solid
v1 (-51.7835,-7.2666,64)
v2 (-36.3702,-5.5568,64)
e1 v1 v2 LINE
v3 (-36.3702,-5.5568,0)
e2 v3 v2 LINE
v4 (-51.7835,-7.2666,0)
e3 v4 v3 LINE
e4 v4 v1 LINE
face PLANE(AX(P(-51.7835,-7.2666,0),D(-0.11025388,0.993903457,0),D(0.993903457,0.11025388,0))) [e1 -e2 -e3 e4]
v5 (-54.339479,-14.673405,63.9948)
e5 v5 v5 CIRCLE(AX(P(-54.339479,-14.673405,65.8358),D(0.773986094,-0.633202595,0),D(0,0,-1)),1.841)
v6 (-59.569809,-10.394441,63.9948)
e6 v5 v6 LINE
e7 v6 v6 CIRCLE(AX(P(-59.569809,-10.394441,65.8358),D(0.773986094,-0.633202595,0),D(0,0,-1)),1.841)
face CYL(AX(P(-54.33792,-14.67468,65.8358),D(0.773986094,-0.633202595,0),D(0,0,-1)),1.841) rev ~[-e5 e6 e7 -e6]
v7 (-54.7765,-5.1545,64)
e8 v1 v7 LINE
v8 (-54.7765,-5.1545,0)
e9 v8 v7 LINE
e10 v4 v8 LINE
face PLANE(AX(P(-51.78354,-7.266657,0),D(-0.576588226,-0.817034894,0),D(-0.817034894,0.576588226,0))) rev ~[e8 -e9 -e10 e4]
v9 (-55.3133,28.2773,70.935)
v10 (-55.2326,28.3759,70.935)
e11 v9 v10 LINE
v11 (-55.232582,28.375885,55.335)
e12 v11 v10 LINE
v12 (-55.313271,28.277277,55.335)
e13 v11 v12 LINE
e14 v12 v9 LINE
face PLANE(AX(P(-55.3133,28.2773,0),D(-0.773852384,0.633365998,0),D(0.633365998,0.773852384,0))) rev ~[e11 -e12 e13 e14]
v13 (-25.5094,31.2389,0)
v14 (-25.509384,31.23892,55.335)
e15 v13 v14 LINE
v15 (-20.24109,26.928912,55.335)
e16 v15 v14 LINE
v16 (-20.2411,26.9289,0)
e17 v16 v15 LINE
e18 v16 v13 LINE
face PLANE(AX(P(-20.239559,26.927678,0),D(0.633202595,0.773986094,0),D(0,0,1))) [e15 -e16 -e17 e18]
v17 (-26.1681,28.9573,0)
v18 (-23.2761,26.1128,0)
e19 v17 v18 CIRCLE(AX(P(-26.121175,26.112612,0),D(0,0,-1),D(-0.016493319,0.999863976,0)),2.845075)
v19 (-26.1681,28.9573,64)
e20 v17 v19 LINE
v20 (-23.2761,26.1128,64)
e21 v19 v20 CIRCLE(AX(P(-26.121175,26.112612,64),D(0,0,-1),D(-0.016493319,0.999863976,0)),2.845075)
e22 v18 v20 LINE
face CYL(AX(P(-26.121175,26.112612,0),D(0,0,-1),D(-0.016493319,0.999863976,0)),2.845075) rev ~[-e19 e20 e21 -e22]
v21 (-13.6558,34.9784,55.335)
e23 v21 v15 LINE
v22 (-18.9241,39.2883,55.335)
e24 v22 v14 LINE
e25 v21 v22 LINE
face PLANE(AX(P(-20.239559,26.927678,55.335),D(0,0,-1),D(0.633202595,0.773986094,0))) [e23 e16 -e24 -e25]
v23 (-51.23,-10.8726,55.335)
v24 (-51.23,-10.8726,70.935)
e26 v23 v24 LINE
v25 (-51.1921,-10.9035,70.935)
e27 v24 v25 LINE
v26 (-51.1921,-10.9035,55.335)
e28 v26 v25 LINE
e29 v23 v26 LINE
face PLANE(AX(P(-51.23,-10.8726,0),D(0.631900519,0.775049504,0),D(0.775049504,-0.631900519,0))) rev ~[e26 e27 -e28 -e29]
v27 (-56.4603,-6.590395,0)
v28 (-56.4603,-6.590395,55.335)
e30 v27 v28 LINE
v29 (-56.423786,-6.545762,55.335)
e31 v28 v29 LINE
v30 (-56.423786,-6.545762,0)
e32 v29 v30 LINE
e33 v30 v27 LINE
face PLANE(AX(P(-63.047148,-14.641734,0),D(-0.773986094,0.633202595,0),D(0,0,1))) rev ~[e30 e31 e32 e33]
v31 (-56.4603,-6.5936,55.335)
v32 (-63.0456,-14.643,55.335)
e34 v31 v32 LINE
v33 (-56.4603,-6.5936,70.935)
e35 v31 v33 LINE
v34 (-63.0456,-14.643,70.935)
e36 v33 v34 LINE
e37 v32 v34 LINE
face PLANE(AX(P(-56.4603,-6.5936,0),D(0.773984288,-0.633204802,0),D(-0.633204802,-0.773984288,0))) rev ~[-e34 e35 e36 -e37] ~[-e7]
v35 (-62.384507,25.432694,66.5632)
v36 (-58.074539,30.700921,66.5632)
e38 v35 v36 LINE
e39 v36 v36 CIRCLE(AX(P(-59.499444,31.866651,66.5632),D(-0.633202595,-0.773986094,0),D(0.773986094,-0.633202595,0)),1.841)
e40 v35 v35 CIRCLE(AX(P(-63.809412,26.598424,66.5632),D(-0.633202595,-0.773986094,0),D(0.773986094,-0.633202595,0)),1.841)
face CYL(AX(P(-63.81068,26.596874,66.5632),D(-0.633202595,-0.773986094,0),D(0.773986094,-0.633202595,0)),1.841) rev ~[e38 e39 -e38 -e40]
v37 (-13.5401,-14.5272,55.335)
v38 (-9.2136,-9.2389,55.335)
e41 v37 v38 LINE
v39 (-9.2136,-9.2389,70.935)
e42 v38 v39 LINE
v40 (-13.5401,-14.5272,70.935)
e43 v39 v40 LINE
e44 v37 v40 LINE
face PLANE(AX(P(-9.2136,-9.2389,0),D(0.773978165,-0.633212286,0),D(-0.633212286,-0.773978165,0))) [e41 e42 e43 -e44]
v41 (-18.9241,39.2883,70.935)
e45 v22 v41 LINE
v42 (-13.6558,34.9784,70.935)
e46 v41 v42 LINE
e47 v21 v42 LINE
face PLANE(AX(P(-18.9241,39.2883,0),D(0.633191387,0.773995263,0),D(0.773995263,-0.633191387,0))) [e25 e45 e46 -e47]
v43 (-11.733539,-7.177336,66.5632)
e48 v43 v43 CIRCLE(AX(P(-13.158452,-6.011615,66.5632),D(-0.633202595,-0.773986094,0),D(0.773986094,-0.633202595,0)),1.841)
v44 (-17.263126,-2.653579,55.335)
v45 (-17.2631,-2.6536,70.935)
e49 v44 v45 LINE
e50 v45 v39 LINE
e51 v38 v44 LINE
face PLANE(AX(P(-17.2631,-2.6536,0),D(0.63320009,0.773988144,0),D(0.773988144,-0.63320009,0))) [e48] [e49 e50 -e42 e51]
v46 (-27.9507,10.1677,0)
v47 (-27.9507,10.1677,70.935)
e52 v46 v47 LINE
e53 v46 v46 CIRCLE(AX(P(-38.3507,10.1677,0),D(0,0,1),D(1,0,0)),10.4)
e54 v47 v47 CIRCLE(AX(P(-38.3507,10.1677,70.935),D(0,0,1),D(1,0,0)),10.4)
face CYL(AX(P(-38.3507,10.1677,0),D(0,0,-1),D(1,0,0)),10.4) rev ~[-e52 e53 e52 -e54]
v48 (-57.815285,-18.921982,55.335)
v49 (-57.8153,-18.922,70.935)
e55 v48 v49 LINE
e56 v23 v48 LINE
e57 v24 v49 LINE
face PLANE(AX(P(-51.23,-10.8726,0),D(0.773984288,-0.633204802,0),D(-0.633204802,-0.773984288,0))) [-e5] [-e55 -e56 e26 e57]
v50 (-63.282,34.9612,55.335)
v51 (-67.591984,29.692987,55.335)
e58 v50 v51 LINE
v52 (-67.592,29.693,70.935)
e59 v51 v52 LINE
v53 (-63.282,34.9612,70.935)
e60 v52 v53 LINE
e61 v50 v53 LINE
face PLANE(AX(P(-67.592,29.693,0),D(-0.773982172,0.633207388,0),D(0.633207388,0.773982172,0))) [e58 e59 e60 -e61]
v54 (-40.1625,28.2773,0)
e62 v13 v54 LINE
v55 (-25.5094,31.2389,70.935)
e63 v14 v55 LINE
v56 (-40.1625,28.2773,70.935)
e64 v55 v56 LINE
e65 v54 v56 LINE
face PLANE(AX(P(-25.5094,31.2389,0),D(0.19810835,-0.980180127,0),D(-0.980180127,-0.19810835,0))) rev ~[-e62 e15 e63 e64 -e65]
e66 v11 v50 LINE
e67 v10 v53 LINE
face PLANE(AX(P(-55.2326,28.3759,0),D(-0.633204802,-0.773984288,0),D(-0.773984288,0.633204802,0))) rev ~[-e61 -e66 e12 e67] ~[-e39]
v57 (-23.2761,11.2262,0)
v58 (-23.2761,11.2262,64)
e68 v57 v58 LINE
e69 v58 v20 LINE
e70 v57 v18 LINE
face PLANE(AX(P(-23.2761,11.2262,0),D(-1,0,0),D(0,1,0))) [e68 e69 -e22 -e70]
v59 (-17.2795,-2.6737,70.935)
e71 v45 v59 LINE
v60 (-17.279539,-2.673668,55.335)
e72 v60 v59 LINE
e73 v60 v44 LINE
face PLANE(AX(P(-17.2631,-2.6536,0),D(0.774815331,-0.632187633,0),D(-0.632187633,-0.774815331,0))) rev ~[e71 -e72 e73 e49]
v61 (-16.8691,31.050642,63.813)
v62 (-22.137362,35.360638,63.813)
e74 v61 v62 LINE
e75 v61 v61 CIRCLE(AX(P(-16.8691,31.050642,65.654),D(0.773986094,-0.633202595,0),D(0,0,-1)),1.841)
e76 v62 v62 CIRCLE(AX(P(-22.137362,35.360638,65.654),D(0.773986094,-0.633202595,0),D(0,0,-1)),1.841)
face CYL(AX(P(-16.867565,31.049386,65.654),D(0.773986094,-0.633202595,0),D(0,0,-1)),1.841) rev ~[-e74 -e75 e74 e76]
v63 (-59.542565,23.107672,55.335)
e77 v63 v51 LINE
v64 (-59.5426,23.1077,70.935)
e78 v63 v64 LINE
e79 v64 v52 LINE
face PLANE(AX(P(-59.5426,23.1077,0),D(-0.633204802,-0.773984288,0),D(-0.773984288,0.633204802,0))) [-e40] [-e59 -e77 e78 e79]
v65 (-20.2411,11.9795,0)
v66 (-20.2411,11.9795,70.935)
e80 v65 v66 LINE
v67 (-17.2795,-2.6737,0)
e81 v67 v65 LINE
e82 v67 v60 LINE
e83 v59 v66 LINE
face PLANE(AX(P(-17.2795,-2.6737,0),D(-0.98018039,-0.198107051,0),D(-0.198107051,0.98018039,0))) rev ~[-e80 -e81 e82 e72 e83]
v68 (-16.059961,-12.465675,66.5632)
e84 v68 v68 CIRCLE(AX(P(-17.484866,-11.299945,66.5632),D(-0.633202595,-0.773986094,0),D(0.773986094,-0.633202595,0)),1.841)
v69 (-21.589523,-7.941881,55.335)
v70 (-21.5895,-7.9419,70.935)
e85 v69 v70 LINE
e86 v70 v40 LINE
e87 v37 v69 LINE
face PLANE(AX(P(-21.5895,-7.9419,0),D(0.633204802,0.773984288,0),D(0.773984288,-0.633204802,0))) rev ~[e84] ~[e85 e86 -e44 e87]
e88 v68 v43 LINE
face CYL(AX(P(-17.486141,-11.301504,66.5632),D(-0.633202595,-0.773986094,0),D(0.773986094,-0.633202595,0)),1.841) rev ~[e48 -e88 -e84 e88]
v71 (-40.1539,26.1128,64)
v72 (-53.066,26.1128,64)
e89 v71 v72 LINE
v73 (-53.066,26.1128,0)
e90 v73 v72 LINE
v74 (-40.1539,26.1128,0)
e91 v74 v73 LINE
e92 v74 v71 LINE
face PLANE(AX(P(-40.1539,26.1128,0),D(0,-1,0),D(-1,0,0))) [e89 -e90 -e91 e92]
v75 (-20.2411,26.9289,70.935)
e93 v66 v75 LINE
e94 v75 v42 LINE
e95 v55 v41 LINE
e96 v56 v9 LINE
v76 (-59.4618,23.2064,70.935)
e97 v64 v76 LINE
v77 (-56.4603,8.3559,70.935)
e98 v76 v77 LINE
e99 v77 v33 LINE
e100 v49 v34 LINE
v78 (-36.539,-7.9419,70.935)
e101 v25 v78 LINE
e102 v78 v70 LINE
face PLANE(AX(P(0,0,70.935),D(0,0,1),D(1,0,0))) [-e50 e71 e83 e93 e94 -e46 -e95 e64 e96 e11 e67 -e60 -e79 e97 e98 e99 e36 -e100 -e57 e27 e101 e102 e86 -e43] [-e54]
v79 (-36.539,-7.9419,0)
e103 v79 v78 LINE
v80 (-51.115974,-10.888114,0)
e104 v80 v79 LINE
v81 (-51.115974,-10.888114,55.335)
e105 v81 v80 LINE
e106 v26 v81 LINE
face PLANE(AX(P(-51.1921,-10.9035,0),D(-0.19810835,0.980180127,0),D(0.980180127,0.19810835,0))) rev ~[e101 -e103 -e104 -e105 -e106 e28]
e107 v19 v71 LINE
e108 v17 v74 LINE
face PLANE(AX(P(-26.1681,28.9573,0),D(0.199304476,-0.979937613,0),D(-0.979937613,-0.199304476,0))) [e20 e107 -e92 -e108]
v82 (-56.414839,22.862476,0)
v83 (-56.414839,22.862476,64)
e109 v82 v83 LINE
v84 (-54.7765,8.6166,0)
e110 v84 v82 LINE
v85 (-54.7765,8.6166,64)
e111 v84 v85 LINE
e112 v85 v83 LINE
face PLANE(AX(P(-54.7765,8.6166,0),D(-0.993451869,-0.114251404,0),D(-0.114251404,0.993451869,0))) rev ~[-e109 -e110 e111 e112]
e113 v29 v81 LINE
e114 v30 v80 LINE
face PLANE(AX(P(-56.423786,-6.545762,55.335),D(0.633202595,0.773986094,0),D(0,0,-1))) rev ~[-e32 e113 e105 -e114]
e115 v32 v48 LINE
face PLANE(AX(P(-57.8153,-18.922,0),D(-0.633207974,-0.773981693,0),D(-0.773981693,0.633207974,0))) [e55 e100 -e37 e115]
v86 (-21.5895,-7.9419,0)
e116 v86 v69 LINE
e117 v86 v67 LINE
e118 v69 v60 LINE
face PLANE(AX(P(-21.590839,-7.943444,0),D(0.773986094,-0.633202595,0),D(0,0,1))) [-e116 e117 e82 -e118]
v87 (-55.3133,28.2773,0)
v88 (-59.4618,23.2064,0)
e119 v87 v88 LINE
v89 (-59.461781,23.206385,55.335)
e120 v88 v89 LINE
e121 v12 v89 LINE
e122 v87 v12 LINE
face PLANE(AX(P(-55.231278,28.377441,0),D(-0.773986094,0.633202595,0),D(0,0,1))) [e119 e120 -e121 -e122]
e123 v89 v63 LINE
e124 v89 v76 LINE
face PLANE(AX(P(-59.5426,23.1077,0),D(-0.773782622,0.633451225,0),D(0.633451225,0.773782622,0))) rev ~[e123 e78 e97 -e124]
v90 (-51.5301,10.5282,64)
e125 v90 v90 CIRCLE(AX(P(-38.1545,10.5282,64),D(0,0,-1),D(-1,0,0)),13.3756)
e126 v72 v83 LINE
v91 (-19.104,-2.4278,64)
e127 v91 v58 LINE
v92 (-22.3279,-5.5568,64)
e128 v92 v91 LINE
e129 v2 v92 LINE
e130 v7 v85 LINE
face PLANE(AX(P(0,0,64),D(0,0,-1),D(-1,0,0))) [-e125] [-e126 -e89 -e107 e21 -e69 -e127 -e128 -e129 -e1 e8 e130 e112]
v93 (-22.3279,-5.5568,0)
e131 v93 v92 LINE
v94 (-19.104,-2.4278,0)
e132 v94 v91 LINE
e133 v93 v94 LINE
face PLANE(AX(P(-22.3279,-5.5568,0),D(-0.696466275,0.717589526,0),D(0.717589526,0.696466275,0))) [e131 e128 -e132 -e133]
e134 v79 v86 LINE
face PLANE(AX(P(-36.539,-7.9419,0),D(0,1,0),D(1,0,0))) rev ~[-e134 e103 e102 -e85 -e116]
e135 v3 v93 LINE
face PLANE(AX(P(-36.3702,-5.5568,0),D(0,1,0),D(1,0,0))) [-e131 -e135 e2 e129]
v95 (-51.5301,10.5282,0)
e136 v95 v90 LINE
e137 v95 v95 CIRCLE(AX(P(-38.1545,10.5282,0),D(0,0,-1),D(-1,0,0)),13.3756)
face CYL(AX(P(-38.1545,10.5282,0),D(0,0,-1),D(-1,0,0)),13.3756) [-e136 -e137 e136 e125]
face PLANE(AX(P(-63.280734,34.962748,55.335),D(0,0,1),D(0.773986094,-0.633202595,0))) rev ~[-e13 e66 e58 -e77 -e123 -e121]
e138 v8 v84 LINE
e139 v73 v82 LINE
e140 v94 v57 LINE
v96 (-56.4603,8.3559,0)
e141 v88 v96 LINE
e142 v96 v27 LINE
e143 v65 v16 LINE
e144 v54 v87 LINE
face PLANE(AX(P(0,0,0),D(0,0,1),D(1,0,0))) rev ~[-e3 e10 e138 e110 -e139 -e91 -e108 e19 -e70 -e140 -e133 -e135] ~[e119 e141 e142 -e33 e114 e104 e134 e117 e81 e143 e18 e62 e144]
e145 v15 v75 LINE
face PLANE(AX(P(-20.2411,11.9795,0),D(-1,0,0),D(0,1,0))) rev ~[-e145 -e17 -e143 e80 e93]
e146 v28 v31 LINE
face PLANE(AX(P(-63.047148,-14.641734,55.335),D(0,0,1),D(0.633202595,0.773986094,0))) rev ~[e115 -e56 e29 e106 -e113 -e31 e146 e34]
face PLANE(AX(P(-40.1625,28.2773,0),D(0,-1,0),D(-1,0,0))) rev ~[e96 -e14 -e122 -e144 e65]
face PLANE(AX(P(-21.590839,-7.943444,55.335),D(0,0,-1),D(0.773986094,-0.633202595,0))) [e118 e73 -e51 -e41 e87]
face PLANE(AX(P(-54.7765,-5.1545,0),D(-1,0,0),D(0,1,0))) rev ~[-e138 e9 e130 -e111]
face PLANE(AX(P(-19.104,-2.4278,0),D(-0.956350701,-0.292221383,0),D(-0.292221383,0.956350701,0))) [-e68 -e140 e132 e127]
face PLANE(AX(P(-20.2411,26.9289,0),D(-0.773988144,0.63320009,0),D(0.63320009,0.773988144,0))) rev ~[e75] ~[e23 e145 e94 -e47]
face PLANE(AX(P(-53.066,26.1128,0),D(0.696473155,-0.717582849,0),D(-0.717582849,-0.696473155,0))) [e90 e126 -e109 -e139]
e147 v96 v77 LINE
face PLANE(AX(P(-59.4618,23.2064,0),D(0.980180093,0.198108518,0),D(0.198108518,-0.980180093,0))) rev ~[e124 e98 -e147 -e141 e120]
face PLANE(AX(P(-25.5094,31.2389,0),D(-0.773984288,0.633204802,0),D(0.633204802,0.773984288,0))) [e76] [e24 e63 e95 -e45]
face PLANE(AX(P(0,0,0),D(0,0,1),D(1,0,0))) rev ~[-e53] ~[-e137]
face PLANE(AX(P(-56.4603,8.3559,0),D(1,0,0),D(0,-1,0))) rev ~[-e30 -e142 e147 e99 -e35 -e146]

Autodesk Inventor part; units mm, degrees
ref_plane "YZ Plane" through (0, 0, 0) normal (1, 0, 0) x (0, 1, 0)
ref_plane "XZ Plane" through (0, 0, 0) normal (0, 1, 0) x (-1, 0, 0)
ref_plane "XY Plane" through (0, 0, 0) normal (0, 0, 1) x (1, 0, 0)
sketch "Sketch1" plane through (0, 0, 0) normal (0, 0, 1) x (1, 0, 0)
  circle A0 centre (-38.3507, 10.1677) radius 10.4
  line L0 (-51.23, -10.8726) -> (-51.1921, -10.9035)
  line L1 (-51.1921, -10.9035) -> (-36.539, -7.9419)
  line L2 (-36.539, -7.9419) -> (-21.5895, -7.9419)
  line L3 (-21.5895, -7.9419) -> (-13.5401, -14.5272)
  line L4 (-9.2136, -9.2389) -> (-13.5401, -14.5272)
  line L5 (-17.2631, -2.6536) -> (-9.2136, -9.2389)
  line L6 (-17.2631, -2.6536) -> (-17.2795, -2.6737)
  line L7 (-17.2795, -2.6737) -> (-20.2411, 11.9795)
  line L8 (-20.2411, 11.9795) -> (-20.2411, 26.9289)
  line L9 (-20.2411, 26.9289) -> (-13.6558, 34.9784)
  line L10 (-18.9241, 39.2883) -> (-13.6558, 34.9784)
  line L11 (-25.5094, 31.2389) -> (-18.9241, 39.2883)
  line L12 (-25.5094, 31.2389) -> (-40.1625, 28.2773)
  line L13 (-40.1625, 28.2773) -> (-55.3133, 28.2773)
  line L14 (-55.3133, 28.2773) -> (-55.2326, 28.3759)
  line L15 (-55.2326, 28.3759) -> (-63.282, 34.9612)
  line L16 (-67.592, 29.693) -> (-63.282, 34.9612)
  line L17 (-59.5426, 23.1077) -> (-67.592, 29.693)
  line L18 (-59.5426, 23.1077) -> (-59.4618, 23.2064)
  line L19 (-59.4618, 23.2064) -> (-56.4603, 8.3559)
  line L20 (-56.4603, 8.3559) -> (-56.4603, -6.5936)
  line L21 (-56.4603, -6.5936) -> (-63.0456, -14.643)
  line L22 (-57.8153, -18.922) -> (-63.0456, -14.643)
  line L23 (-51.23, -10.8726) -> (-57.8153, -18.922)
  circle A1 centre (-38.3507, 10.1677) radius 10.4
  line L24 (-51.23, -10.8726) -> (-51.1921, -10.9035)
  line L25 (-51.1921, -10.9035) -> (-36.539, -7.9419)
  line L26 (-36.539, -7.9419) -> (-21.5895, -7.9419)
  line L27 (-21.5895, -7.9419) -> (-13.5401, -14.5272)
  line L28 (-9.2136, -9.2389) -> (-13.5401, -14.5272)
  line L29 (-17.2631, -2.6536) -> (-9.2136, -9.2389)
  line L30 (-17.2631, -2.6536) -> (-17.2795, -2.6737)
  line L31 (-17.2795, -2.6737) -> (-20.2411, 11.9795)
  line L32 (-20.2411, 11.9795) -> (-20.2411, 26.9289)
  line L33 (-20.2411, 26.9289) -> (-13.6558, 34.9784)
  line L34 (-18.9241, 39.2883) -> (-13.6558, 34.9784)
  line L35 (-25.5094, 31.2389) -> (-18.9241, 39.2883)
  line L36 (-25.5094, 31.2389) -> (-40.1625, 28.2773)
  line L37 (-40.1625, 28.2773) -> (-55.3133, 28.2773)
  line L38 (-55.3133, 28.2773) -> (-55.2326, 28.3759)
  line L39 (-55.2326, 28.3759) -> (-63.282, 34.9612)
  line L40 (-67.592, 29.693) -> (-63.282, 34.9612)
  line L41 (-59.5426, 23.1077) -> (-67.592, 29.693)
  line L42 (-59.5426, 23.1077) -> (-59.4618, 23.2064)
  line L43 (-59.4618, 23.2064) -> (-56.4603, 8.3559)
  line L44 (-56.4603, 8.3559) -> (-56.4603, -6.5936)
  line L45 (-56.4603, -6.5936) -> (-63.0456, -14.643)
  line L46 (-57.8153, -18.922) -> (-63.0456, -14.643)
  line L47 (-51.23, -10.8726) -> (-57.8153, -18.922)
  point P0 (0, 0)
extrude "Extrusion1" add sketch "Sketch1" along normal blind 70.935
sketch "Sketch2" plane through (-59.5426, 23.1077, 0) normal (-0.6332026, -0.7739861, 0) x (0.7739861, -0.6332026, 0)
  line L0 (47.2215, 0) -> (47.2215, 55.335)
  line L1 (49.0358, 0) -> (49.0358, 70.935) projected
  line L2 (49.0358, 55.335) -> (60.717, 55.335)
  line L3 (60.717, 55.335) -> (60.717, 0)
  line L4 (60.717, 0) -> (49.0358, 0)
extrude "Extrusion2" cut sketch "Sketch2" against normal blind 70.935
sketch "Sketch3" plane through (-13.6558, 34.9784, 70.935) normal (0.7739861, -0.6332026, 0) x (0, 0, -1)
  line L0 (70.935, -21.9707) -> (70.935, -10.4) projected
  line L1 (70.935, -10.4) -> (15.6, -10.4)
  line L2 (70.935, -10.4) -> (0, -10.4) projected
  line L3 (15.6, -10.4) -> (15.6, 1.2922)
  line L4 (15.6, 1.2922) -> (70.935, 1.2922)
  line L5 (70.935, 1.2922) -> (70.935, -10.4)
  point P0 (70.935, -18.4258)
extrude "Extrusion3" cut sketch "Sketch3" against normal blind 70.935
sketch "Sketch5" plane through (-63.282, 34.9612, 70.935) normal (0.6332026, 0.7739861, 0) x (0.7739861, -0.6332026, 0)
  line L0 (0, 70.935) -> (0, 0) projected
  line L1 (0, 70.935) -> (0, 15.6)
  line L2 (0, 15.6) -> (10.4, 15.6)
  line L3 (10.4, 70.935) -> (10.4, 0) projected
  line L4 (10.4, 15.6) -> (10.4, 70.935)
  line L5 (10.4, 70.935) -> (0, 70.935)
  point P0 (71.117, 70.935)
  point P1 (10.4, 15.6)
extrude "Extrusion4" cut sketch "Sketch5" against normal blind 70.935
sketch "Sketch6" plane through (-63.0456, -14.643, 0) normal (-0.7739861, 0.6332026, 0) x (0, 0, 1)
  line L0 (0, 0) -> (0, 10.4) projected
  line L1 (0, 0) -> (55.335, 0)
  line L2 (0, 0) -> (70.935, 0) projected
  line L3 (55.335, 0) -> (55.335, 10.4601)
  line L4 (55.335, 10.4601) -> (0, 10.4601)
  line L5 (0, 10.4601) -> (0, 0)
  point P0 (0, 51.2542)
extrude "Extrusion5" cut sketch "Sketch6" against normal blind 70.935
sketch "Sketch7" plane through (-13.6558, 34.9784, 70.935) normal (0.7739861, -0.6332026, 0) x (0, 0, -1)
  circle A0 centre (5.281, -5.0747) radius 1.841
  point P0 (70.935, -18.4258)
extrude "Extrusion6" cut sketch "Sketch7" against normal blind 70.935
sketch "Sketch8" plane through (-51.23, -10.8726, 70.935) normal (0.7739861, -0.6332026, 0) x (0, 0, -1)
  circle A0 centre (5.0992, -4.9107) radius 1.841
  point P0 (70.935, 40.8542)
extrude "Extrusion7" cut sketch "Sketch8" against normal blind 70.935
sketch "Sketch9" plane through (-13.5401, -14.5272, 55.335) normal (-0.6332026, -0.7739861, 0) x (0.7739861, -0.6332026, 0)
  circle A0 centre (-5.0967, 11.2282) radius 1.841
  circle A1 centre (-64.9486, 11.2282) radius 1.841
  point P0 (1.2811, -55.335)
extrude "Extrusion8" cut sketch "Sketch9" against normal blind 70.935
sketch "Sketch10" plane through (0, 0, 0) normal (0, 0, -1) x (-1, 0, 0)
  line L0 (22.3279, -5.5568) -> (19.104, -2.4278)
  line L1 (19.104, -2.4278) -> (23.2761, 11.2262)
  line L2 (23.2761, 11.2262) -> (23.2761, 26.1128)
  arc A0 (26.1681, 28.9573) -> (23.2761, 26.1128) centre (26.1211, 26.1128) ccw
  line L3 (26.1681, 28.9573) -> (40.1539, 26.1128)
  line L4 (40.1539, 26.1128) -> (53.066, 26.1128)
  line L5 (53.066, 26.1128) -> (56.4891, 22.7904)
  line L6 (50.9259, -7.8719) -> (54.7765, -5.1545)
  line L7 (54.7765, -5.1545) -> (54.7765, 8.6166)
  line L8 (54.7765, 8.6166) -> (56.4881, 23.4995)
  line L9 (51.7835, -7.2666) -> (36.3702, -5.5568)
  line L10 (36.3702, -5.5568) -> (22.3279, -5.5568)
  circle A1 centre (38.1545, 10.5282) radius 13.3756
  point P0 (0, 0)
  point P1 (56.4148, 22.8625)
extrude "Extrusion9" cut sketch "Sketch10" against normal blind 64
properties part number "Lifter compartment"
